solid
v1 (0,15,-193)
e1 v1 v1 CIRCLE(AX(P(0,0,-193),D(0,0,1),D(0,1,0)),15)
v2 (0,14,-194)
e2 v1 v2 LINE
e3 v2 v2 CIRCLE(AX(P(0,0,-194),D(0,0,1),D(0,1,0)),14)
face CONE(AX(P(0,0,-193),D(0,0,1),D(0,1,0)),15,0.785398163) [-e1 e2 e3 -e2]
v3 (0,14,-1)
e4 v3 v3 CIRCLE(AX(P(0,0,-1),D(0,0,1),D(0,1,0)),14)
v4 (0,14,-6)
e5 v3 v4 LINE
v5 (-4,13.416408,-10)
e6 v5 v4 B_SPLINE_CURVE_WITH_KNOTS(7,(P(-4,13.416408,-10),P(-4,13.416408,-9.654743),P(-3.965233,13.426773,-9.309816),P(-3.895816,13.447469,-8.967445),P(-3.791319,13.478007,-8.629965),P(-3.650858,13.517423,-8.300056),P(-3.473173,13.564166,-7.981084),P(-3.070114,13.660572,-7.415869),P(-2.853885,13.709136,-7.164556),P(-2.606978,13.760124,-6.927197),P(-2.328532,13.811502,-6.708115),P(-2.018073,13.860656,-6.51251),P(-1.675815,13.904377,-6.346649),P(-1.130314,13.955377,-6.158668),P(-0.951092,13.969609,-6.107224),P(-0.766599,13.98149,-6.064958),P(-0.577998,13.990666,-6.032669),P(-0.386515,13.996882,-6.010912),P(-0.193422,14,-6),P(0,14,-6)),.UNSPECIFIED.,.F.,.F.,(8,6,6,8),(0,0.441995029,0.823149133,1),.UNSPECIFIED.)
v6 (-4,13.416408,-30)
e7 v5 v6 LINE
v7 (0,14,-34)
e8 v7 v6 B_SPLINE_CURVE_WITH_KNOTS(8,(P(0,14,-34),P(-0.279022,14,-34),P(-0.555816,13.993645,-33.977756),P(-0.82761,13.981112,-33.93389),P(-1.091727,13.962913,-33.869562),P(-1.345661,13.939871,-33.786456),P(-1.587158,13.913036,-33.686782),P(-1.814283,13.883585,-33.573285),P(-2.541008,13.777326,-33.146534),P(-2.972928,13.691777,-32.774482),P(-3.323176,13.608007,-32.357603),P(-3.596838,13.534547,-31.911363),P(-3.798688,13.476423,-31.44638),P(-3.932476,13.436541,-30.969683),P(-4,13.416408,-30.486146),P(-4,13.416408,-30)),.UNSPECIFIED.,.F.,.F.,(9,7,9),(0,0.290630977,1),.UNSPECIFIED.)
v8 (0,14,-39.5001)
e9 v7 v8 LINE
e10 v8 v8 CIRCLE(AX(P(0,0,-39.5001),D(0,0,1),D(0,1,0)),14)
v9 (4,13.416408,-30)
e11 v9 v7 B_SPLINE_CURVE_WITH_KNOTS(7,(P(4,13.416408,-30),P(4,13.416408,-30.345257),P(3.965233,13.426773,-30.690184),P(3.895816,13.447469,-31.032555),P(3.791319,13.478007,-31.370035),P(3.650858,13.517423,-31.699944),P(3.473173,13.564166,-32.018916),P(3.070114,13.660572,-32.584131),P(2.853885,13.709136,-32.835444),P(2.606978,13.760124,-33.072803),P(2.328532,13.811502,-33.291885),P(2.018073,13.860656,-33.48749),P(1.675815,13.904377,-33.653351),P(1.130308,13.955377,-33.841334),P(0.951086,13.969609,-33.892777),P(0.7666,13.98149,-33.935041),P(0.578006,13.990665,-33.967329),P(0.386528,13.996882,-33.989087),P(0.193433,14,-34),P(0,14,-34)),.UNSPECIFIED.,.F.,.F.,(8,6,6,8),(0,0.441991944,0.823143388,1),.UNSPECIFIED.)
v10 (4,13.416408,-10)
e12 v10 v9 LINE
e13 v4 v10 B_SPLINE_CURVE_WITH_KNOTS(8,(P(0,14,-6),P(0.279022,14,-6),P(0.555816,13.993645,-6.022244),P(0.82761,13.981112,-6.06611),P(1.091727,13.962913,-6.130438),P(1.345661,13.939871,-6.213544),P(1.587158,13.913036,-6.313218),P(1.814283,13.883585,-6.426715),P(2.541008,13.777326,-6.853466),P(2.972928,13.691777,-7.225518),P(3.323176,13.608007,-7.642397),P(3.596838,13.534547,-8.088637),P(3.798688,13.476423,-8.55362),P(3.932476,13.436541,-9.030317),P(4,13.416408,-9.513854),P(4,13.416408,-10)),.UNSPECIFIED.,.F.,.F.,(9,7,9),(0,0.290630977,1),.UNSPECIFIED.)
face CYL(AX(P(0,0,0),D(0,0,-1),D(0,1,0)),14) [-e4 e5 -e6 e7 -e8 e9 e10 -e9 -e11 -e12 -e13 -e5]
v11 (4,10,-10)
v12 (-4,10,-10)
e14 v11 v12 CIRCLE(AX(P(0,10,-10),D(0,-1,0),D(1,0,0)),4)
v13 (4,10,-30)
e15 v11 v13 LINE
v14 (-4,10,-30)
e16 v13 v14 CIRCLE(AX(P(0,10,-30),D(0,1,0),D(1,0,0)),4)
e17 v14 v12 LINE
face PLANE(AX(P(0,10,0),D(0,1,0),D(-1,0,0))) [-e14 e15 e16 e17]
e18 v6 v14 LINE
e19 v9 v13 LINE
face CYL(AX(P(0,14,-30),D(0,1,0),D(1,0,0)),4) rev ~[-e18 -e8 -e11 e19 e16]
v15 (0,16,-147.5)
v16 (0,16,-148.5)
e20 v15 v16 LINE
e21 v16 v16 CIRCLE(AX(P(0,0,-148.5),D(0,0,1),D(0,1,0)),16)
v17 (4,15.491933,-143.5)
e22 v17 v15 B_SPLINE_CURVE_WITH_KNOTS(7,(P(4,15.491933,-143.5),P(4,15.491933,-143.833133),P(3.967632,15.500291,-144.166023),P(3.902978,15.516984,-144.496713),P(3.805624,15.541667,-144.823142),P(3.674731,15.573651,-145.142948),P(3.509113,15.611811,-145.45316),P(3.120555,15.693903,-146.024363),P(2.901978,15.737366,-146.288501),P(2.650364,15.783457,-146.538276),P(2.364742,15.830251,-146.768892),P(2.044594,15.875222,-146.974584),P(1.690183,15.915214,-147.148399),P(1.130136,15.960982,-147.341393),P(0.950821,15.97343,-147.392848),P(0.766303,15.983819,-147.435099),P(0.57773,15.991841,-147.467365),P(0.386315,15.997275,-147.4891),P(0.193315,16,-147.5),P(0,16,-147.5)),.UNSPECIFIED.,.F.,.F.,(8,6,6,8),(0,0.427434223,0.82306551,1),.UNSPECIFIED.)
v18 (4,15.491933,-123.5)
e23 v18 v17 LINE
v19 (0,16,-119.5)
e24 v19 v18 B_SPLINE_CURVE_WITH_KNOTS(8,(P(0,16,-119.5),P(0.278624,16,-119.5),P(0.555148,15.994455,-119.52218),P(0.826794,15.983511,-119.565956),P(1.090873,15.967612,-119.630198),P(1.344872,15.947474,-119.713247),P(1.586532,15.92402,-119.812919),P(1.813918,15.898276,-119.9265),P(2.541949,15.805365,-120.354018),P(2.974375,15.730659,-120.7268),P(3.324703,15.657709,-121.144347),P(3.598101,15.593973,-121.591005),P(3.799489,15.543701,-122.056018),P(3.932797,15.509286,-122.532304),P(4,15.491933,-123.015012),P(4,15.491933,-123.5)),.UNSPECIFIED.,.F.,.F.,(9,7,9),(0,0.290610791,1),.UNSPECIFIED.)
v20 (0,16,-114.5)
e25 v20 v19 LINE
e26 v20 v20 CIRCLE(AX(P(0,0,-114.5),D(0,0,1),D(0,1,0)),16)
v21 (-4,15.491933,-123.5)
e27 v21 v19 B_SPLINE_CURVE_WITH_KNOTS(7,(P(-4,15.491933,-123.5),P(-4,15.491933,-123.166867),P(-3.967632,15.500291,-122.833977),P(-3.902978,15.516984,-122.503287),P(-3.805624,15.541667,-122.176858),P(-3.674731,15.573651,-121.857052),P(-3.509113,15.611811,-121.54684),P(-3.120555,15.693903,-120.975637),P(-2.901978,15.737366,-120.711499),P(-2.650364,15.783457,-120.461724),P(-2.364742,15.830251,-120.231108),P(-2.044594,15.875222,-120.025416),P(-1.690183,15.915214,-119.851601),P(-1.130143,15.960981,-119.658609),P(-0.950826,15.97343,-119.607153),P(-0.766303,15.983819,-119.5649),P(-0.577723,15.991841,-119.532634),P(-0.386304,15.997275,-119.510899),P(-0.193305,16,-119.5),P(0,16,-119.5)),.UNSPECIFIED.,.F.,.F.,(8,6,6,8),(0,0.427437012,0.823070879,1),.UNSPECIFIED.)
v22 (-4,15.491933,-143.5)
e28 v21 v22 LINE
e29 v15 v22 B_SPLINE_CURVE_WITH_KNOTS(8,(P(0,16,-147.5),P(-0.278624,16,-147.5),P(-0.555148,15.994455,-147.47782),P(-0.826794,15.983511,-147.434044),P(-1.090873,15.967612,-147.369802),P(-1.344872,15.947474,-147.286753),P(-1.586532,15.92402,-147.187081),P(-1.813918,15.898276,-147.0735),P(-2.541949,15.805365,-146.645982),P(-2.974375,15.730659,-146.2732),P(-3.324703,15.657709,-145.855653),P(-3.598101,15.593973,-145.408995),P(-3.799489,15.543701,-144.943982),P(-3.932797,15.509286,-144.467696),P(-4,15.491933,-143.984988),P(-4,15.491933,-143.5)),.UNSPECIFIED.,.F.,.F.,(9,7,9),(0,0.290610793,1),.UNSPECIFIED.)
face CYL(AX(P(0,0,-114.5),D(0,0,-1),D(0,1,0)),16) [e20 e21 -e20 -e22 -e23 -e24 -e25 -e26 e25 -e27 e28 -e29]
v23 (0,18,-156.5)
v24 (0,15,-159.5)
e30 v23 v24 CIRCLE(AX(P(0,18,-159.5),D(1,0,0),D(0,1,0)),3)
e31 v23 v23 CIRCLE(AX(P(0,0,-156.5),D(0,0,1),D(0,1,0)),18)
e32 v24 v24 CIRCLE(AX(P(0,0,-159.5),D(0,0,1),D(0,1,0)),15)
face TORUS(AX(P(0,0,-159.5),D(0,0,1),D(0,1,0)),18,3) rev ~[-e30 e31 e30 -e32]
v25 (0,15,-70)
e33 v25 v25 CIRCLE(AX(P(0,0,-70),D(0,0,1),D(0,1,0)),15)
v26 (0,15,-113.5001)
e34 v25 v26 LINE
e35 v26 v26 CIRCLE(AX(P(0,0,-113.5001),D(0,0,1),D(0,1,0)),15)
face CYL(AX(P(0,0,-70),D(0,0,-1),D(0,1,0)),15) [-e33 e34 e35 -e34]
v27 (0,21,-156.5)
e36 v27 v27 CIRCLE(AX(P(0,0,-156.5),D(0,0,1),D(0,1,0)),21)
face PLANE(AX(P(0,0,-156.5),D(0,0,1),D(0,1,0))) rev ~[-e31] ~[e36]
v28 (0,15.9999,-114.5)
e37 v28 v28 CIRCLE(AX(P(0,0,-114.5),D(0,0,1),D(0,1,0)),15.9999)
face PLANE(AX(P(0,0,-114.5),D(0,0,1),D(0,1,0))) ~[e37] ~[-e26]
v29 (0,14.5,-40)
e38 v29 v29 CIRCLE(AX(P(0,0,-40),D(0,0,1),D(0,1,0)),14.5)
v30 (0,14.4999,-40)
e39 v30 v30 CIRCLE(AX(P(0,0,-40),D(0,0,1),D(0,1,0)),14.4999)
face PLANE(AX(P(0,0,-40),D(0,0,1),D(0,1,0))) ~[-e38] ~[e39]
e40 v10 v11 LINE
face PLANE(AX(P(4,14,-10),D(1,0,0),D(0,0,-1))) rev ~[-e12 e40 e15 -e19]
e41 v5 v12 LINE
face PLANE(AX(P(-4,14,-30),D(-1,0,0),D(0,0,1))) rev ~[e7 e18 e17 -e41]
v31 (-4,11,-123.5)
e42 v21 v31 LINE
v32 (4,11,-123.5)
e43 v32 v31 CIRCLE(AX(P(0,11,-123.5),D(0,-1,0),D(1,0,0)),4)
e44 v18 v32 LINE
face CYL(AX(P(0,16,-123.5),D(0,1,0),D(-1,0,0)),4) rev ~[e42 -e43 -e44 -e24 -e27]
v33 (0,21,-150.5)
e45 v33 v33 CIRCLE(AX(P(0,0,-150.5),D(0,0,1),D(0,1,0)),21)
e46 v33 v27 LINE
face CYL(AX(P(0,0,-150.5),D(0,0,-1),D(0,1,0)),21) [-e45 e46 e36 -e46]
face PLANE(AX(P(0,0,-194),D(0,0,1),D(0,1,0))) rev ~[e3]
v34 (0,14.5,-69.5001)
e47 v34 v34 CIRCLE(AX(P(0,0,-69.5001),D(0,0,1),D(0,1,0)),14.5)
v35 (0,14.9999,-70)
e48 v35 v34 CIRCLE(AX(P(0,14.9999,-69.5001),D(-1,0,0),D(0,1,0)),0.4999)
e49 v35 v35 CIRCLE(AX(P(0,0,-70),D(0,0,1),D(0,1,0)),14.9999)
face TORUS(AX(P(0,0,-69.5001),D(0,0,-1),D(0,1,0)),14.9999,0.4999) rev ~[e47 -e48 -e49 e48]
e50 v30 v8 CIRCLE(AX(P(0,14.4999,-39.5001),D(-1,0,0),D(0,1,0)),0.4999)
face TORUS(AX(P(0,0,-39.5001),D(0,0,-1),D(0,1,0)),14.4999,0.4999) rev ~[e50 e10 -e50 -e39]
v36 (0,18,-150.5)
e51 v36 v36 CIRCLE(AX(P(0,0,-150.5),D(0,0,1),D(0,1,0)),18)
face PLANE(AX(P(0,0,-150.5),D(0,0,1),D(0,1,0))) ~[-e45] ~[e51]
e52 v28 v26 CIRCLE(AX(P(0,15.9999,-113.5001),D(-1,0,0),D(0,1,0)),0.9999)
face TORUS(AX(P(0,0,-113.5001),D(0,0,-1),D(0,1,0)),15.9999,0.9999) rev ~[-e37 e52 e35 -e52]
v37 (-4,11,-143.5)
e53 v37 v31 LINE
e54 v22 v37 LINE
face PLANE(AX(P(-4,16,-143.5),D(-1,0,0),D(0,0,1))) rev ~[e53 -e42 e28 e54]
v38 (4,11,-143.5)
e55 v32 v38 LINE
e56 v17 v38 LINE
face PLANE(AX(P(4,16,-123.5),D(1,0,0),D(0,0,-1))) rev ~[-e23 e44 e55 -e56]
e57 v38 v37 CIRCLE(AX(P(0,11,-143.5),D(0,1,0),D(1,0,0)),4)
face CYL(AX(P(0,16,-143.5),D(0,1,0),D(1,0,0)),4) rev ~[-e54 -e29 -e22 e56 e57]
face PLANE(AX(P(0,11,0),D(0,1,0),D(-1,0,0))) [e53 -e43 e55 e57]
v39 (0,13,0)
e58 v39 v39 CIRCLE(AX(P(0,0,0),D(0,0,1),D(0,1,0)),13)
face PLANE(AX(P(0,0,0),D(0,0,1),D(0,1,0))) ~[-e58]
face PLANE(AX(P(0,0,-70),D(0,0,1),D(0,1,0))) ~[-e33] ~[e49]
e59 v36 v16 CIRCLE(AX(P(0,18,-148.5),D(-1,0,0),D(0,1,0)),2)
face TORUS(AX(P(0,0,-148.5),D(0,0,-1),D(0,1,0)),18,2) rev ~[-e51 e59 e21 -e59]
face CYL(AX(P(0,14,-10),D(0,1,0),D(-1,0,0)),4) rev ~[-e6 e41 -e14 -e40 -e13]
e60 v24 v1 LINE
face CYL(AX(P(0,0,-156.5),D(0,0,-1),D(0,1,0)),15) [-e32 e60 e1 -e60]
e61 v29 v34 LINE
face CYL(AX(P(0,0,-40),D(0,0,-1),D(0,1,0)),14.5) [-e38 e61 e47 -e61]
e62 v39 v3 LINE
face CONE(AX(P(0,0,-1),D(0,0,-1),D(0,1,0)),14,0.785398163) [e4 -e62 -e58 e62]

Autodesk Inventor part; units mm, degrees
ref_plane "YZ Plane" through (0, 0, 0) normal (1, 0, 0) x (0, 1, 0)
sketch "Sketch1" plane through (0, 0, 0) normal (1, 0, 0) x (0, 1, 0)
  line L0 (0, 0) -> (14, 0)
  line L1 (14, 0) -> (14, -40)
  line L2 (14, -40) -> (14.5, -40)
  line L3 (14.5, -40) -> (14.5, -70)
  line L4 (14.5, -70) -> (15, -70)
  line L5 (15, -70) -> (15, -114.5)
  line L6 (15, -114.5) -> (16, -114.5)
  line L7 (16, -114.5) -> (16, -150.5)
  line L8 (16, -150.5) -> (21, -150.5)
  line L9 (21, -150.5) -> (21, -156.5)
  line L10 (21, -156.5) -> (15, -156.5)
  line L11 (15, -156.5) -> (15, -194)
  line L12 (0, -232.8) -> (0, 38.8) projected
  line L13 (15, -194) -> (0, -194)
  dimension "d0" = 40
  dimension "d1" = 14
  dimension "d2" = 30
  dimension "d3" = 14.5
  dimension "d4" = 15
  dimension "d5" = 44.5
  dimension "d9" = 16
  dimension "d10" = 21
  dimension "d11" = 6
  dimension "d12" = 37.5
  dimension "d14" = 36
  dimension "d24" = 15
revolve "Revolution1" add sketch "Sketch1" angle 360 about axis through (0, 0, -10) along (0, 0, 1)
chamfer "Chamfer1" distance 1 angle 45 2 edges at (0, -15, -194) (0, -14, 0)
fillet "Fillet1" radius 3 1 edges at (0, -15, -156.5)
fillet "Fillet2" radius 2 1 edges at (0, -16, -150.5)
fillet "Fillet3" radius 1 1 edges at (0, -15, -114.5)
fillet "Fillet4" radius 0.5 2 edges at (0, -14.5, -70) (0, -14, -40)
ref_plane "Work Plane1" through (0, 14, 0) normal (0, 1, 0) x (-1, 0, 0)
sketch "Sketch2" plane through (0, 14, 0) normal (0, 1, 0) x (-1, 0, 0)
  line L0 (0, -40.8) -> (0, 6.8) projected
  line L1 (0, -10) -> (0, -30) construction
  line L2 (-4, -10) -> (-4, -30)
  line L3 (4, -30) -> (4, -10)
  arc A0 (4, -10) -> (-4, -10) centre (0, -10) ccw
  arc A1 (-4, -30) -> (4, -30) centre (0, -30) ccw
  point P0 (0, 0)
  point P1 (0, -20)
  dimension "d26" = 10
  dimension "d27" = 8
  dimension "d28" = 20
extrude "Extrusion1" cut sketch "Sketch2" against normal blind 4
ref_plane "Work Plane2" through (0, 16, 0) normal (0, 1, 0) x (-1, 0, 0)
sketch "Sketch3" plane through (0, 16, 0) normal (0, 1, 0) x (-1, 0, 0)
  line L0 (0, -177) -> (0, 29.5) projected
  line L1 (0, -143.5) -> (0, -123.5) construction
  line L2 (4, -143.5) -> (4, -123.5)
  line L3 (-4, -123.5) -> (-4, -143.5)
  arc A0 (-4, -143.5) -> (4, -143.5) centre (0, -143.5) ccw
  arc A1 (4, -123.5) -> (-4, -123.5) centre (0, -123.5) ccw
  line L4 (-15, -113.5) -> (15, -113.5) projected
  line L5 (-16, -114.5) -> (16, -114.5) projected
  point P0 (0, 0)
  point P1 (0, -133.5)
  dimension "d32" = 8
  dimension "d34" = 9
  dimension "d35" = 20
extrude "Extrusion2" cut sketch "Sketch3" against normal blind 5
properties part number "Truc_2"
